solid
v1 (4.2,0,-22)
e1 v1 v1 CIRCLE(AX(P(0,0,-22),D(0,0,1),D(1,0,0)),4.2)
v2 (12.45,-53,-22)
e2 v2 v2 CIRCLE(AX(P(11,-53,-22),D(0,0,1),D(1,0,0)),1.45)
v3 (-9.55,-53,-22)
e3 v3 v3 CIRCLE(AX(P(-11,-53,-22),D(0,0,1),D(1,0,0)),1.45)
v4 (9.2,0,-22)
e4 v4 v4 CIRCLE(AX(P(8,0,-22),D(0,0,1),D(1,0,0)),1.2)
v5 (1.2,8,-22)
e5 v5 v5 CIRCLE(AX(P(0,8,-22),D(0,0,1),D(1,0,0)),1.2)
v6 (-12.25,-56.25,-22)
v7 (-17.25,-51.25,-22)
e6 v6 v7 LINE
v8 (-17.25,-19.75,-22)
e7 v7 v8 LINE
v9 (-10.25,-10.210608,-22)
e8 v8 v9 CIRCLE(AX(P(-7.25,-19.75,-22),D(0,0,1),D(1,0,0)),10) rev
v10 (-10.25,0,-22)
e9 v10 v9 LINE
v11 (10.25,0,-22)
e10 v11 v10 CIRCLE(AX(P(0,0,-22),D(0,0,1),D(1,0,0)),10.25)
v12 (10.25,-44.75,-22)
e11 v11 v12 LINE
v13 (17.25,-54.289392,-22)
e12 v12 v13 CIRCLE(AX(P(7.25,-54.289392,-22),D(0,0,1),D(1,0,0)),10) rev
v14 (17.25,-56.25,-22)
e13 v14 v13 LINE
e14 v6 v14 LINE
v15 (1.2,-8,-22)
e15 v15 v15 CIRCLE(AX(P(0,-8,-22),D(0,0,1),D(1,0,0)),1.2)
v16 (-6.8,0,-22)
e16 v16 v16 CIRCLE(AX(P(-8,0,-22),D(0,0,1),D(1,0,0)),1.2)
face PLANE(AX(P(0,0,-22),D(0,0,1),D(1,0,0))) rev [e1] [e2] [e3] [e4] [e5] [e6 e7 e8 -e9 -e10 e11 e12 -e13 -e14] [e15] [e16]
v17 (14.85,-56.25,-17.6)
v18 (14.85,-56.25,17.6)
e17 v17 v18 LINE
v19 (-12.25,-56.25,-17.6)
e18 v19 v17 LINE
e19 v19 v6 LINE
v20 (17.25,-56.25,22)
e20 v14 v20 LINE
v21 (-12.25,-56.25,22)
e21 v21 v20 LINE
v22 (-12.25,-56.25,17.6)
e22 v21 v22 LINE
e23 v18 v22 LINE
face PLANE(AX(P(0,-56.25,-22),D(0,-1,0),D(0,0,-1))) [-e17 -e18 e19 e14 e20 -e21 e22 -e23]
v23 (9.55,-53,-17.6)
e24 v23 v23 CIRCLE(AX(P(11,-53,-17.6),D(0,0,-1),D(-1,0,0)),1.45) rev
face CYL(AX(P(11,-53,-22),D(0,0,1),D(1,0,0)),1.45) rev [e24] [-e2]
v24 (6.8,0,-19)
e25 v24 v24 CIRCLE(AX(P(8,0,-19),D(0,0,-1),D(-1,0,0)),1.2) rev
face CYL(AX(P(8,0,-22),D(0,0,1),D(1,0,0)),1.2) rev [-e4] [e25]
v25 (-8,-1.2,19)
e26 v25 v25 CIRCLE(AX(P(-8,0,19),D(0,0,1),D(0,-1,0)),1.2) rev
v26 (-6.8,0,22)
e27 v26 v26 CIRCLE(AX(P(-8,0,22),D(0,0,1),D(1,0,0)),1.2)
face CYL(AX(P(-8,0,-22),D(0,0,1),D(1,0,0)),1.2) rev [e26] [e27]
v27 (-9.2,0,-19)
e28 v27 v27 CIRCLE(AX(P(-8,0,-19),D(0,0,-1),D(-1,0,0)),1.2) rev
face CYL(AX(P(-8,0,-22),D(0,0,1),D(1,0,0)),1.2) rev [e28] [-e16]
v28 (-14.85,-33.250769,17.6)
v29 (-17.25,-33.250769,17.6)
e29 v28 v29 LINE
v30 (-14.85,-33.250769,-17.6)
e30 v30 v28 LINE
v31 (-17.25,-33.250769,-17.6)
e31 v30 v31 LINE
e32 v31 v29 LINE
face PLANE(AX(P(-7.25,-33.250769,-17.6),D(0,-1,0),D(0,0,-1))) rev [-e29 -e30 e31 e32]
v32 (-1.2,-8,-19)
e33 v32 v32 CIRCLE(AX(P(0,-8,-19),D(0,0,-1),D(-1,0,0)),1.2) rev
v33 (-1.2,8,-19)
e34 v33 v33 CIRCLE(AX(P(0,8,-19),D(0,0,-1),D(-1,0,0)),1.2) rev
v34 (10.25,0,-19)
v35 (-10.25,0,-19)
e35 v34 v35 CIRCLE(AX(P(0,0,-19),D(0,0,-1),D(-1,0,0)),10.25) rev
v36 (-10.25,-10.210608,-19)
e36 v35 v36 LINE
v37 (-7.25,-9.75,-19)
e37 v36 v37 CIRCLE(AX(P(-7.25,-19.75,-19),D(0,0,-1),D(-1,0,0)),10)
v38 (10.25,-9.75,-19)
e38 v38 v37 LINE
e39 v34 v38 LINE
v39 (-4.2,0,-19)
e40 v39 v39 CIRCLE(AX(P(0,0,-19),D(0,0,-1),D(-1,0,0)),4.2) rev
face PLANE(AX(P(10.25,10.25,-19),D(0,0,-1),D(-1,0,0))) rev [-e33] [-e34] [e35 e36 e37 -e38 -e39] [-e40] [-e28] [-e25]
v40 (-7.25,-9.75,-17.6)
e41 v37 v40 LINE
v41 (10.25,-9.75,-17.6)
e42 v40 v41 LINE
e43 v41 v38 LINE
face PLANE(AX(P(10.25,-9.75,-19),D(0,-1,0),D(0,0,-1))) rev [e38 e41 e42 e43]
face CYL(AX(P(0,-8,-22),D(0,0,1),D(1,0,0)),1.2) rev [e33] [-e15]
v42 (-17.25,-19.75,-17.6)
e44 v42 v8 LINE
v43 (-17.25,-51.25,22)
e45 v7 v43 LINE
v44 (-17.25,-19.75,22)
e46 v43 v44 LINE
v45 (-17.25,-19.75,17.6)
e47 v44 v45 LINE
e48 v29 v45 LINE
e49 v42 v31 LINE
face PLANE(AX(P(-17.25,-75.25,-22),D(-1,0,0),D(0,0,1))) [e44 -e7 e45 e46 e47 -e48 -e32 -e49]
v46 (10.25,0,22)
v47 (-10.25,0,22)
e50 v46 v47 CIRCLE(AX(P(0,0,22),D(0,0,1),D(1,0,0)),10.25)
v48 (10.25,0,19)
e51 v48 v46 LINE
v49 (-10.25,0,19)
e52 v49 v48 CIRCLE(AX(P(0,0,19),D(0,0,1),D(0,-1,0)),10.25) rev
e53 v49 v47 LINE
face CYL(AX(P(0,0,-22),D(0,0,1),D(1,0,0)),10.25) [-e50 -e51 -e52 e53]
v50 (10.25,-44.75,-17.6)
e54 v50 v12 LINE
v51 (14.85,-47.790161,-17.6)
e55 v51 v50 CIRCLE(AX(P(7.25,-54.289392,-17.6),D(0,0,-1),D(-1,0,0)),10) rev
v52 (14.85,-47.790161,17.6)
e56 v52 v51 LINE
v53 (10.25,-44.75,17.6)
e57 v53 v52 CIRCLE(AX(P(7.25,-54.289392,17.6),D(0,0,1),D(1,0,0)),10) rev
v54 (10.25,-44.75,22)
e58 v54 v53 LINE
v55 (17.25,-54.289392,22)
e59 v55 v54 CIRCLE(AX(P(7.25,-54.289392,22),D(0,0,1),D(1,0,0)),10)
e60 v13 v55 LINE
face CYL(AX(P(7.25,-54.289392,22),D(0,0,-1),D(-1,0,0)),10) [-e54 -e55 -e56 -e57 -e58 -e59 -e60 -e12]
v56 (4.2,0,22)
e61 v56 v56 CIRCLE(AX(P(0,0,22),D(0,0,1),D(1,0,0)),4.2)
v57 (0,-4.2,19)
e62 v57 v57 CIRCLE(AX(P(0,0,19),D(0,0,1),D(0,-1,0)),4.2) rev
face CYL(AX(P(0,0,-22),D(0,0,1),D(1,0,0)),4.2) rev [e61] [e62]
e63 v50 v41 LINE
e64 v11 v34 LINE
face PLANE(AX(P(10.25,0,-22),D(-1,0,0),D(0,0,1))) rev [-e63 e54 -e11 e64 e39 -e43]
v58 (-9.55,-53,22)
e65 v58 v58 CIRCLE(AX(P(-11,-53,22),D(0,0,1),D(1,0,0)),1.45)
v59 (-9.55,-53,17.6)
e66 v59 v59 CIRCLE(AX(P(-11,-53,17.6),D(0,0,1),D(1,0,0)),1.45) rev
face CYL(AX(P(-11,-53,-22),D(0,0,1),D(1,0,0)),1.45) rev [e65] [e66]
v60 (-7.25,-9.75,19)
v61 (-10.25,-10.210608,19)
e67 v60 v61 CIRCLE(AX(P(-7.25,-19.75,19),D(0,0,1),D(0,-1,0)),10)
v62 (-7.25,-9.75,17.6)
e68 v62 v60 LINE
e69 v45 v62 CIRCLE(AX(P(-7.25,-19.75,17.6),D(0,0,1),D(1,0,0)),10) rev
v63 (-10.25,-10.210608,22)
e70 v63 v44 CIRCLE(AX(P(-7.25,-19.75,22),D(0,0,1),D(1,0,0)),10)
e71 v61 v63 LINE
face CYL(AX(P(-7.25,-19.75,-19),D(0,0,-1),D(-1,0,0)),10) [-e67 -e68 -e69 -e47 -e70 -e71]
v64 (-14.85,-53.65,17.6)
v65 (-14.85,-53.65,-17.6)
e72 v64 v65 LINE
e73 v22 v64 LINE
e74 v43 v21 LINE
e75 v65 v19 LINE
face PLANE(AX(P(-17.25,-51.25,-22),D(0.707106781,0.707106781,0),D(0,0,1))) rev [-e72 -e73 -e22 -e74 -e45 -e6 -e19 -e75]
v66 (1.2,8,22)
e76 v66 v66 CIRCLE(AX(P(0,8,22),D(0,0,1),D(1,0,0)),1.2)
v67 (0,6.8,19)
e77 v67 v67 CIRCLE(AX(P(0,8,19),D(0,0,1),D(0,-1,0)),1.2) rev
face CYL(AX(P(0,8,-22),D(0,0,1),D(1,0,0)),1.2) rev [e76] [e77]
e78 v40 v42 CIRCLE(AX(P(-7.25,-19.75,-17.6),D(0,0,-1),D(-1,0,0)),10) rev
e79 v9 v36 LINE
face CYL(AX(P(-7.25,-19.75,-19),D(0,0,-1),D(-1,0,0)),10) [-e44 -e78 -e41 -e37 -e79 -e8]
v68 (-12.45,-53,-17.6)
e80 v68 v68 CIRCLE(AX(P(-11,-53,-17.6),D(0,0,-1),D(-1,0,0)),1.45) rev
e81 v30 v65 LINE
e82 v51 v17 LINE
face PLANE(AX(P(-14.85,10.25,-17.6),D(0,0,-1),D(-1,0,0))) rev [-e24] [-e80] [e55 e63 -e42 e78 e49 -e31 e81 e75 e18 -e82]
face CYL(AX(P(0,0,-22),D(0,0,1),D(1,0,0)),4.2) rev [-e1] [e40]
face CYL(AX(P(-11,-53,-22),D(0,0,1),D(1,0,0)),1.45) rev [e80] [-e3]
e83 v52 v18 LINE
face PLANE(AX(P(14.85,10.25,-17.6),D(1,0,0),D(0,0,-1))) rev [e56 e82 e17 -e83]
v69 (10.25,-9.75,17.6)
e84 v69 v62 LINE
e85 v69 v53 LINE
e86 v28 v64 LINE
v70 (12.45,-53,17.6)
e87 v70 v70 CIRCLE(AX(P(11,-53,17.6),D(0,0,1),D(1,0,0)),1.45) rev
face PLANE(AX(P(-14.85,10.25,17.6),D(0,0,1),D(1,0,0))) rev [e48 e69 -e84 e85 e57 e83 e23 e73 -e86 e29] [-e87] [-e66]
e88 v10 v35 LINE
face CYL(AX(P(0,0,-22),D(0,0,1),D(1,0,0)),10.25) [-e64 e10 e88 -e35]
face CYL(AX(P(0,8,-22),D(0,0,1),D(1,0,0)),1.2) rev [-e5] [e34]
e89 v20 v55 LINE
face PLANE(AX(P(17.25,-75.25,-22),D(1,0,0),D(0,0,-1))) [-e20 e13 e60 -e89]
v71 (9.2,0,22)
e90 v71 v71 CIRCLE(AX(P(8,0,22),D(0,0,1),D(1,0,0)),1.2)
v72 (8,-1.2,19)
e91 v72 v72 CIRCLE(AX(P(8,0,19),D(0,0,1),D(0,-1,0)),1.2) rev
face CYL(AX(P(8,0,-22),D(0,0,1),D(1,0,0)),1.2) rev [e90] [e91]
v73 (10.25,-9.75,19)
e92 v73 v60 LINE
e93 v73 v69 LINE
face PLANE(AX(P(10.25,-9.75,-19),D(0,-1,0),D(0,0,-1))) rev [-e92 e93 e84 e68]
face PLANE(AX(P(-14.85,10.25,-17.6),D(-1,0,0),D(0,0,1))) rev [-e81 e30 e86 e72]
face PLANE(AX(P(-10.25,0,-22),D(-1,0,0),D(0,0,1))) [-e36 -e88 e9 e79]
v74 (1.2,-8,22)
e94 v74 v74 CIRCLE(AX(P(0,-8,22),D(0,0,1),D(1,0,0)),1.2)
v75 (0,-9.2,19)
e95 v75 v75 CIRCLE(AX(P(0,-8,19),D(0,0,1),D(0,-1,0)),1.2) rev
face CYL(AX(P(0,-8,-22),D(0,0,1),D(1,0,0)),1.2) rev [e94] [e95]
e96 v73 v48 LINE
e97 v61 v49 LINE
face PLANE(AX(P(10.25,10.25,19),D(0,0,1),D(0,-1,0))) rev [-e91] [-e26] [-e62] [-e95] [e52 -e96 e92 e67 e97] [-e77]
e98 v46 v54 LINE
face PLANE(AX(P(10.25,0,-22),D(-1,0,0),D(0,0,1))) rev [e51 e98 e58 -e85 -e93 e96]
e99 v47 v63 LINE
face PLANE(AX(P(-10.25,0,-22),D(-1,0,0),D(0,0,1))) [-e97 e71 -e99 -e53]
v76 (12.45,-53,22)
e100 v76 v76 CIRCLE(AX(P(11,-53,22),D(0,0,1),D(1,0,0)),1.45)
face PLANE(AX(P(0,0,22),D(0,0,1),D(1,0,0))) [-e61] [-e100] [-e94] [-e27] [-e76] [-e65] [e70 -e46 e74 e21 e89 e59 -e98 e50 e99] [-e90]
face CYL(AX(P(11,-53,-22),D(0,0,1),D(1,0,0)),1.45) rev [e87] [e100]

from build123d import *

# Parameters (mm, degrees)
BOSS_EXTRUDE1_DEPTH      = 22
BOSS_EXTRUDE1_DEPTH_BACK = 22
SKETCH2_W                = 38
SKETCH2_H                = 20
CUT_EXTRUDE1_DEPTH       = 105.423416914
SKETCH3_W                = 7
SKETCH3_H                = 44
BOSS_EXTRUDE2_DEPTH      = 65.5
SKETCH23_R               = 5
SKETCH23_R_2             = 1.2
CUT_EXTRUDE2_DEPTH       = 111.605436123
SKETCH24_W               = 28.5
SKETCH24_H               = 34
CUT_EXTRUDE3_DEPTH       = 90.954502389
SKETCH26_R               = 1.2
SKETCH26_R_2             = 5
SKETCH26_R_3             = 1.45
CUT_EXTRUDE6_DEPTH       = 107.330263801
SKETCH27_W               = 29.7
SKETCH27_H               = 35.2
CUT_EXTRUDE8_DEPTH       = 73.137455597
SKETCH29_W               = 7
SKETCH29_H               = 35
CUT_EXTRUDE10_DEPTH      = 74.468530678
CHAMFER2_SIZE            = 5
FILLET1_START            = -23
FILLET1_DEPTH            = 46
FILLET2_R                = 10
SKETCH30_W               = 35.2
SKETCH30_H               = 20
CUT_EXTRUDE12_DEPTH      = 10


with BuildPart() as part:
    # Sketch1 → Boss-Extrude1 (new, two sides: drawn at the far end of the back side and taken through both)
    with BuildSketch(Plane.XY.offset(-BOSS_EXTRUDE1_DEPTH_BACK)):
        with BuildLine():
            Line((10.25, -60), (10.25, 0))
            ThreePointArc((10.25, 0), (0, -10.25), (-10.25, 0))
            Line((-10.25, 0), (-10.25, -60))
            Line((-10.25, -60), (-10.25, -100))
            Line((-10.25, -100), (10.25, -100))
            Line((10.25, -100), (10.25, -60))
        make_face()
        with BuildLine():
            Line((10.25, 0), (9.2, 0))
            ThreePointArc((9.2, 0), (8.816088231, -0.879772698), (7.91, -1.196620241))
            ThreePointArc((7.91, -1.196620241), (5.656854249, -5.656854249), (1.196620241, -7.91))
            ThreePointArc((1.196620241, -7.91), (1.199154762, -7.954968281), (1.2, -8))
            ThreePointArc((1.2, -8), (-0.045031719, -9.199154762), (-1.196620241, -7.91))
            ThreePointArc((-1.196620241, -7.91), (-5.656854249, -5.656854249), (-7.91, -1.196620241))
            ThreePointArc((-7.91, -1.196620241), (-8.816088231, -0.879772698), (-9.2, 0))
            Line((-9.2, 0), (-10.25, 0))
            ThreePointArc((-10.25, 0), (0, -10.25), (10.25, 0))
        make_face()
        with BuildLine():
            ThreePointArc((7.91, -1.196620241), (7.120227302, -0.816088231), (6.8, 0))
            Line((6.8, 0), (4.2, 0))
            ThreePointArc((4.2, 0), (0, -4.2), (-4.2, 0))
            Line((-4.2, 0), (-6.8, 0))
            ThreePointArc((-6.8, 0), (-7.120227302, -0.816088231), (-7.91, -1.196620241))
            ThreePointArc((-7.91, -1.196620241), (-5.656854249, -5.656854249), (-1.196620241, -7.91))
            ThreePointArc((-1.196620241, -7.91), (0, -6.8), (1.196620241, -7.91))
            ThreePointArc((1.196620241, -7.91), (5.656854249, -5.656854249), (7.91, -1.196620241))
        make_face()
        with BuildLine():
            Line((4.2, 0), (6.8, 0))
            ThreePointArc((6.8, 0), (7.120227302, 0.816088231), (7.91, 1.196620241))
            ThreePointArc((7.91, 1.196620241), (5.656854249, 5.656854249), (1.196620241, 7.91))
            ThreePointArc((1.196620241, 7.91), (0, 6.8), (-1.196620241, 7.91))
            ThreePointArc((-1.196620241, 7.91), (-5.656854249, 5.656854249), (-7.91, 1.196620241))
            ThreePointArc((-7.91, 1.196620241), (-7.120227302, 0.816088231), (-6.8, 0))
            Line((-6.8, 0), (-4.2, 0))
            ThreePointArc((-4.2, 0), (0, 4.2), (4.2, 0))
        make_face()
        with BuildLine():
            ThreePointArc((7.91, 1.196620241), (8.816088231, 0.879772698), (9.2, 0))
            Line((9.2, 0), (10.25, 0))
            ThreePointArc((10.25, 0), (0, 10.25), (-10.25, 0))
            Line((-10.25, 0), (-9.2, 0))
            ThreePointArc((-9.2, 0), (-8.816088231, 0.879772698), (-7.91, 1.196620241))
            ThreePointArc((-7.91, 1.196620241), (-5.656854249, 5.656854249), (-1.196620241, 7.91))
            ThreePointArc((-1.196620241, 7.91), (-0.045031719, 9.199154762), (1.2, 8))
            ThreePointArc((1.2, 8), (1.199154762, 7.954968281), (1.196620241, 7.91))
            ThreePointArc((1.196620241, 7.91), (5.656854249, 5.656854249), (7.91, 1.196620241))
        make_face()
    extrude(amount=BOSS_EXTRUDE1_DEPTH + BOSS_EXTRUDE1_DEPTH_BACK)

    # Sketch2 → Cut-Extrude1 (cut, through all)
    with BuildSketch(Plane.ZY.offset(10.25)):
        with Locations((0, 0.25)):
            Rectangle(SKETCH2_W, SKETCH2_H)
    extrude(amount=-CUT_EXTRUDE1_DEPTH, mode=Mode.SUBTRACT)

    # Sketch3 → Boss-Extrude2 (add)
    with BuildSketch(Plane(origin=(0, -9.75, 0), x_dir=(1, 0, 0), z_dir=(0, 1, 0))):
        with Locations((-13.75, 0)):
            Rectangle(SKETCH3_W, SKETCH3_H)
        with Locations((13.75, 0)):
            Rectangle(SKETCH3_W, SKETCH3_H)
    extrude(amount=-BOSS_EXTRUDE2_DEPTH)

    # Sketch23 → Cut-Extrude2 (cut, through all)
    with BuildSketch(Plane.XY.offset(22)):
        with BuildLine():
            Line((-10.25, -100), (10.25, -100))
            Line((10.25, -100), (10.25, -85))
            ThreePointArc((10.25, -85), (0, -95.25), (-10.25, -85))
            Line((-10.25, -85), (-10.25, -100))
        make_face()
        with Locations((0, -85)):
            Circle(SKETCH23_R)
        with Locations((8, -85)):
            Circle(SKETCH23_R_2)
        with Locations((0, -77)):
            Circle(SKETCH23_R_2)
        with Locations((0, -93)):
            Circle(SKETCH23_R_2)
        with Locations((-8, -85)):
            Circle(SKETCH23_R_2)
    extrude(amount=-CUT_EXTRUDE2_DEPTH, mode=Mode.SUBTRACT)

    # Sketch24 → Cut-Extrude3 (cut, through all)
    with BuildSketch(Plane(origin=(0, -9.75, 0), x_dir=(1, 0, 0), z_dir=(0, 1, 0))):
        Rectangle(SKETCH24_W, SKETCH24_H)
    extrude(amount=-CUT_EXTRUDE3_DEPTH, mode=Mode.SUBTRACT)

    # Sketch26 → Cut-Extrude6 (cut, through all)
    # profile 1 of 5: a face of its own
    with BuildSketch(Plane.XY.offset(22)):
        with BuildLine():
            Line((10.25, -75.25), (14.25, -75.25))
            Line((14.25, -75.25), (14.25, -56.53282359))
            Line((14.25, -56.53282359), (14.25, -56.25))
            Line((14.25, -56.25), (-14.25, -56.25))
            Line((-14.25, -56.25), (-14.25, -56.53282359))
            Line((-14.25, -56.53282359), (-14.25, -75.25))
            Line((-14.25, -75.25), (-10.25, -75.25))
            Line((-10.25, -75.25), (-10.25, -85))
            ThreePointArc((-10.25, -85), (0, -95.25), (10.25, -85))
            Line((10.25, -85), (10.25, -75.25))
        make_face()
        with Locations((-8, -85)):
            Circle(SKETCH26_R, mode=Mode.SUBTRACT)
        with Locations((0, -85)):
            Circle(SKETCH26_R_2, mode=Mode.SUBTRACT)
        with Locations((0, -77)):
            Circle(SKETCH26_R, mode=Mode.SUBTRACT)
        with Locations((0, -93)):
            Circle(SKETCH26_R, mode=Mode.SUBTRACT)
        with Locations((8, -85)):
            Circle(SKETCH26_R, mode=Mode.SUBTRACT)
    # profile 2 of 5: a face of its own
    with BuildSketch(Plane.XY.offset(22)):
        Polygon((-17.25, -75.25), (-14.25, -75.25), (-14.25, -56.53282359), (-14.25, -56.25), (-17.25, -56.25), align=None)
    # profile 3 of 5: a face of its own
    with BuildSketch(Plane.XY.offset(22)):
        Polygon((14.25, -56.53282359), (14.25, -75.25), (17.25, -75.25), (17.25, -56.25), (14.25, -56.25), align=None)
    # profile 4 of 5: a face of its own
    with BuildSketch(Plane.XY.offset(22)):
        with Locations((-11, -53)):
            Circle(SKETCH26_R_3)
    # profile 5 of 5: a face of its own
    with BuildSketch(Plane.XY.offset(22)):
        with Locations((11, -53)):
            Circle(SKETCH26_R_3)
    extrude(amount=-CUT_EXTRUDE6_DEPTH, mode=Mode.SUBTRACT)

    # Sketch27 → Cut-Extrude8 (cut, through all)
    with BuildSketch(Plane.XZ.offset(56.25)):
        Rectangle(SKETCH27_W, SKETCH27_H)
    extrude(amount=-CUT_EXTRUDE8_DEPTH, mode=Mode.SUBTRACT)

    # Sketch29 → Cut-Extrude10 (cut, through all)
    with BuildSketch(Plane(origin=(0, 0, -22), x_dir=(-1, 0, 0), z_dir=(0, 0, -1))):
        with Locations((-13.75, -27.25)):
            Rectangle(SKETCH29_W, SKETCH29_H)
    extrude(amount=-CUT_EXTRUDE10_DEPTH, mode=Mode.SUBTRACT)

    # Chamfer2
    # the kernel refuses this chamfer: 5 mm, written as the material it takes off along each edge
    with BuildSketch(Plane(origin=(-17.25, -56.25, 34.85841494), x_dir=(1, 0, 0), z_dir=(0, 0, -1))) as chamfer2_piece_1:
        Polygon((CHAMFER2_SIZE, 0), (0, -CHAMFER2_SIZE), (0, 0), align=None)
    extrude(amount=69.71682988, mode=Mode.SUBTRACT)

    # Fillet1: read off the stored shape, not the designer's step
    # Fillet1 outline → Fillet1 (cut)
    with BuildSketch(Plane.XY.offset(FILLET1_START)):
        with BuildLine():
            ThreePointArc((10.25, -44.75), (15.312257748, -48.373312231), (17.25, -54.289392014))
            Line((17.25, -54.289392014), (17.25, -44.75))
            Line((17.25, -44.75), (10.25, -44.75))
        make_face()
    extrude(amount=FILLET1_DEPTH, mode=Mode.SUBTRACT)

    # Fillet2
    # the kernel refuses this fillet: 10 mm, written as the material it takes off along each edge
    with BuildSketch(Plane(origin=(-17.25, -9.75, -47), x_dir=(1, 0, 0), z_dir=(0, 0, 1))) as fillet2_piece_1_section:
        with BuildLine():
            CenterArc((FILLET2_R, -FILLET2_R), FILLET2_R, 90, 90)
            Line((0, -FILLET2_R), (0, 0))
            Line((0, 0), (FILLET2_R, 0))
        make_face()
    fillet2_piece_1 = extrude(amount=94, mode=Mode.PRIVATE)
    fillet2_piece_1 = split(fillet2_piece_1, bisect_by=Plane(origin=(-10.25, -9.75, -47), z_dir=(-1, 0, 0)), keep=Keep.TOP, mode=Mode.PRIVATE)
    add(fillet2_piece_1, mode=Mode.SUBTRACT)
    with BuildSketch(Plane(origin=(-17.25, -9.75, -47), x_dir=(1, 0, 0), z_dir=(0, 0, 1))) as fillet2_piece_2_section:
        with BuildLine():
            CenterArc((FILLET2_R, -FILLET2_R), FILLET2_R, 90, 90)
            Line((0, -FILLET2_R), (0, 0))
            Line((0, 0), (FILLET2_R, 0))
        make_face()
    fillet2_piece_2 = extrude(amount=94, mode=Mode.PRIVATE)
    fillet2_piece_2 = split(fillet2_piece_2, bisect_by=Plane(origin=(-17.25, -9.75, -19), z_dir=(0, 0, 1)), keep=Keep.TOP, mode=Mode.PRIVATE)
    fillet2_piece_2 = split(fillet2_piece_2, bisect_by=Plane(origin=(-17.25, -9.75, 19), z_dir=(0, 0, -1)), keep=Keep.TOP, mode=Mode.PRIVATE)
    add(fillet2_piece_2, mode=Mode.SUBTRACT)

    # Sketch30 → Cut-Extrude12 (cut)
    with BuildSketch(Plane.ZY.offset(17.25)):
        with Locations((0, -23.250769276)):
            Rectangle(SKETCH30_W, SKETCH30_H)
    extrude(amount=-CUT_EXTRUDE12_DEPTH, mode=Mode.SUBTRACT)


solid = part.part
